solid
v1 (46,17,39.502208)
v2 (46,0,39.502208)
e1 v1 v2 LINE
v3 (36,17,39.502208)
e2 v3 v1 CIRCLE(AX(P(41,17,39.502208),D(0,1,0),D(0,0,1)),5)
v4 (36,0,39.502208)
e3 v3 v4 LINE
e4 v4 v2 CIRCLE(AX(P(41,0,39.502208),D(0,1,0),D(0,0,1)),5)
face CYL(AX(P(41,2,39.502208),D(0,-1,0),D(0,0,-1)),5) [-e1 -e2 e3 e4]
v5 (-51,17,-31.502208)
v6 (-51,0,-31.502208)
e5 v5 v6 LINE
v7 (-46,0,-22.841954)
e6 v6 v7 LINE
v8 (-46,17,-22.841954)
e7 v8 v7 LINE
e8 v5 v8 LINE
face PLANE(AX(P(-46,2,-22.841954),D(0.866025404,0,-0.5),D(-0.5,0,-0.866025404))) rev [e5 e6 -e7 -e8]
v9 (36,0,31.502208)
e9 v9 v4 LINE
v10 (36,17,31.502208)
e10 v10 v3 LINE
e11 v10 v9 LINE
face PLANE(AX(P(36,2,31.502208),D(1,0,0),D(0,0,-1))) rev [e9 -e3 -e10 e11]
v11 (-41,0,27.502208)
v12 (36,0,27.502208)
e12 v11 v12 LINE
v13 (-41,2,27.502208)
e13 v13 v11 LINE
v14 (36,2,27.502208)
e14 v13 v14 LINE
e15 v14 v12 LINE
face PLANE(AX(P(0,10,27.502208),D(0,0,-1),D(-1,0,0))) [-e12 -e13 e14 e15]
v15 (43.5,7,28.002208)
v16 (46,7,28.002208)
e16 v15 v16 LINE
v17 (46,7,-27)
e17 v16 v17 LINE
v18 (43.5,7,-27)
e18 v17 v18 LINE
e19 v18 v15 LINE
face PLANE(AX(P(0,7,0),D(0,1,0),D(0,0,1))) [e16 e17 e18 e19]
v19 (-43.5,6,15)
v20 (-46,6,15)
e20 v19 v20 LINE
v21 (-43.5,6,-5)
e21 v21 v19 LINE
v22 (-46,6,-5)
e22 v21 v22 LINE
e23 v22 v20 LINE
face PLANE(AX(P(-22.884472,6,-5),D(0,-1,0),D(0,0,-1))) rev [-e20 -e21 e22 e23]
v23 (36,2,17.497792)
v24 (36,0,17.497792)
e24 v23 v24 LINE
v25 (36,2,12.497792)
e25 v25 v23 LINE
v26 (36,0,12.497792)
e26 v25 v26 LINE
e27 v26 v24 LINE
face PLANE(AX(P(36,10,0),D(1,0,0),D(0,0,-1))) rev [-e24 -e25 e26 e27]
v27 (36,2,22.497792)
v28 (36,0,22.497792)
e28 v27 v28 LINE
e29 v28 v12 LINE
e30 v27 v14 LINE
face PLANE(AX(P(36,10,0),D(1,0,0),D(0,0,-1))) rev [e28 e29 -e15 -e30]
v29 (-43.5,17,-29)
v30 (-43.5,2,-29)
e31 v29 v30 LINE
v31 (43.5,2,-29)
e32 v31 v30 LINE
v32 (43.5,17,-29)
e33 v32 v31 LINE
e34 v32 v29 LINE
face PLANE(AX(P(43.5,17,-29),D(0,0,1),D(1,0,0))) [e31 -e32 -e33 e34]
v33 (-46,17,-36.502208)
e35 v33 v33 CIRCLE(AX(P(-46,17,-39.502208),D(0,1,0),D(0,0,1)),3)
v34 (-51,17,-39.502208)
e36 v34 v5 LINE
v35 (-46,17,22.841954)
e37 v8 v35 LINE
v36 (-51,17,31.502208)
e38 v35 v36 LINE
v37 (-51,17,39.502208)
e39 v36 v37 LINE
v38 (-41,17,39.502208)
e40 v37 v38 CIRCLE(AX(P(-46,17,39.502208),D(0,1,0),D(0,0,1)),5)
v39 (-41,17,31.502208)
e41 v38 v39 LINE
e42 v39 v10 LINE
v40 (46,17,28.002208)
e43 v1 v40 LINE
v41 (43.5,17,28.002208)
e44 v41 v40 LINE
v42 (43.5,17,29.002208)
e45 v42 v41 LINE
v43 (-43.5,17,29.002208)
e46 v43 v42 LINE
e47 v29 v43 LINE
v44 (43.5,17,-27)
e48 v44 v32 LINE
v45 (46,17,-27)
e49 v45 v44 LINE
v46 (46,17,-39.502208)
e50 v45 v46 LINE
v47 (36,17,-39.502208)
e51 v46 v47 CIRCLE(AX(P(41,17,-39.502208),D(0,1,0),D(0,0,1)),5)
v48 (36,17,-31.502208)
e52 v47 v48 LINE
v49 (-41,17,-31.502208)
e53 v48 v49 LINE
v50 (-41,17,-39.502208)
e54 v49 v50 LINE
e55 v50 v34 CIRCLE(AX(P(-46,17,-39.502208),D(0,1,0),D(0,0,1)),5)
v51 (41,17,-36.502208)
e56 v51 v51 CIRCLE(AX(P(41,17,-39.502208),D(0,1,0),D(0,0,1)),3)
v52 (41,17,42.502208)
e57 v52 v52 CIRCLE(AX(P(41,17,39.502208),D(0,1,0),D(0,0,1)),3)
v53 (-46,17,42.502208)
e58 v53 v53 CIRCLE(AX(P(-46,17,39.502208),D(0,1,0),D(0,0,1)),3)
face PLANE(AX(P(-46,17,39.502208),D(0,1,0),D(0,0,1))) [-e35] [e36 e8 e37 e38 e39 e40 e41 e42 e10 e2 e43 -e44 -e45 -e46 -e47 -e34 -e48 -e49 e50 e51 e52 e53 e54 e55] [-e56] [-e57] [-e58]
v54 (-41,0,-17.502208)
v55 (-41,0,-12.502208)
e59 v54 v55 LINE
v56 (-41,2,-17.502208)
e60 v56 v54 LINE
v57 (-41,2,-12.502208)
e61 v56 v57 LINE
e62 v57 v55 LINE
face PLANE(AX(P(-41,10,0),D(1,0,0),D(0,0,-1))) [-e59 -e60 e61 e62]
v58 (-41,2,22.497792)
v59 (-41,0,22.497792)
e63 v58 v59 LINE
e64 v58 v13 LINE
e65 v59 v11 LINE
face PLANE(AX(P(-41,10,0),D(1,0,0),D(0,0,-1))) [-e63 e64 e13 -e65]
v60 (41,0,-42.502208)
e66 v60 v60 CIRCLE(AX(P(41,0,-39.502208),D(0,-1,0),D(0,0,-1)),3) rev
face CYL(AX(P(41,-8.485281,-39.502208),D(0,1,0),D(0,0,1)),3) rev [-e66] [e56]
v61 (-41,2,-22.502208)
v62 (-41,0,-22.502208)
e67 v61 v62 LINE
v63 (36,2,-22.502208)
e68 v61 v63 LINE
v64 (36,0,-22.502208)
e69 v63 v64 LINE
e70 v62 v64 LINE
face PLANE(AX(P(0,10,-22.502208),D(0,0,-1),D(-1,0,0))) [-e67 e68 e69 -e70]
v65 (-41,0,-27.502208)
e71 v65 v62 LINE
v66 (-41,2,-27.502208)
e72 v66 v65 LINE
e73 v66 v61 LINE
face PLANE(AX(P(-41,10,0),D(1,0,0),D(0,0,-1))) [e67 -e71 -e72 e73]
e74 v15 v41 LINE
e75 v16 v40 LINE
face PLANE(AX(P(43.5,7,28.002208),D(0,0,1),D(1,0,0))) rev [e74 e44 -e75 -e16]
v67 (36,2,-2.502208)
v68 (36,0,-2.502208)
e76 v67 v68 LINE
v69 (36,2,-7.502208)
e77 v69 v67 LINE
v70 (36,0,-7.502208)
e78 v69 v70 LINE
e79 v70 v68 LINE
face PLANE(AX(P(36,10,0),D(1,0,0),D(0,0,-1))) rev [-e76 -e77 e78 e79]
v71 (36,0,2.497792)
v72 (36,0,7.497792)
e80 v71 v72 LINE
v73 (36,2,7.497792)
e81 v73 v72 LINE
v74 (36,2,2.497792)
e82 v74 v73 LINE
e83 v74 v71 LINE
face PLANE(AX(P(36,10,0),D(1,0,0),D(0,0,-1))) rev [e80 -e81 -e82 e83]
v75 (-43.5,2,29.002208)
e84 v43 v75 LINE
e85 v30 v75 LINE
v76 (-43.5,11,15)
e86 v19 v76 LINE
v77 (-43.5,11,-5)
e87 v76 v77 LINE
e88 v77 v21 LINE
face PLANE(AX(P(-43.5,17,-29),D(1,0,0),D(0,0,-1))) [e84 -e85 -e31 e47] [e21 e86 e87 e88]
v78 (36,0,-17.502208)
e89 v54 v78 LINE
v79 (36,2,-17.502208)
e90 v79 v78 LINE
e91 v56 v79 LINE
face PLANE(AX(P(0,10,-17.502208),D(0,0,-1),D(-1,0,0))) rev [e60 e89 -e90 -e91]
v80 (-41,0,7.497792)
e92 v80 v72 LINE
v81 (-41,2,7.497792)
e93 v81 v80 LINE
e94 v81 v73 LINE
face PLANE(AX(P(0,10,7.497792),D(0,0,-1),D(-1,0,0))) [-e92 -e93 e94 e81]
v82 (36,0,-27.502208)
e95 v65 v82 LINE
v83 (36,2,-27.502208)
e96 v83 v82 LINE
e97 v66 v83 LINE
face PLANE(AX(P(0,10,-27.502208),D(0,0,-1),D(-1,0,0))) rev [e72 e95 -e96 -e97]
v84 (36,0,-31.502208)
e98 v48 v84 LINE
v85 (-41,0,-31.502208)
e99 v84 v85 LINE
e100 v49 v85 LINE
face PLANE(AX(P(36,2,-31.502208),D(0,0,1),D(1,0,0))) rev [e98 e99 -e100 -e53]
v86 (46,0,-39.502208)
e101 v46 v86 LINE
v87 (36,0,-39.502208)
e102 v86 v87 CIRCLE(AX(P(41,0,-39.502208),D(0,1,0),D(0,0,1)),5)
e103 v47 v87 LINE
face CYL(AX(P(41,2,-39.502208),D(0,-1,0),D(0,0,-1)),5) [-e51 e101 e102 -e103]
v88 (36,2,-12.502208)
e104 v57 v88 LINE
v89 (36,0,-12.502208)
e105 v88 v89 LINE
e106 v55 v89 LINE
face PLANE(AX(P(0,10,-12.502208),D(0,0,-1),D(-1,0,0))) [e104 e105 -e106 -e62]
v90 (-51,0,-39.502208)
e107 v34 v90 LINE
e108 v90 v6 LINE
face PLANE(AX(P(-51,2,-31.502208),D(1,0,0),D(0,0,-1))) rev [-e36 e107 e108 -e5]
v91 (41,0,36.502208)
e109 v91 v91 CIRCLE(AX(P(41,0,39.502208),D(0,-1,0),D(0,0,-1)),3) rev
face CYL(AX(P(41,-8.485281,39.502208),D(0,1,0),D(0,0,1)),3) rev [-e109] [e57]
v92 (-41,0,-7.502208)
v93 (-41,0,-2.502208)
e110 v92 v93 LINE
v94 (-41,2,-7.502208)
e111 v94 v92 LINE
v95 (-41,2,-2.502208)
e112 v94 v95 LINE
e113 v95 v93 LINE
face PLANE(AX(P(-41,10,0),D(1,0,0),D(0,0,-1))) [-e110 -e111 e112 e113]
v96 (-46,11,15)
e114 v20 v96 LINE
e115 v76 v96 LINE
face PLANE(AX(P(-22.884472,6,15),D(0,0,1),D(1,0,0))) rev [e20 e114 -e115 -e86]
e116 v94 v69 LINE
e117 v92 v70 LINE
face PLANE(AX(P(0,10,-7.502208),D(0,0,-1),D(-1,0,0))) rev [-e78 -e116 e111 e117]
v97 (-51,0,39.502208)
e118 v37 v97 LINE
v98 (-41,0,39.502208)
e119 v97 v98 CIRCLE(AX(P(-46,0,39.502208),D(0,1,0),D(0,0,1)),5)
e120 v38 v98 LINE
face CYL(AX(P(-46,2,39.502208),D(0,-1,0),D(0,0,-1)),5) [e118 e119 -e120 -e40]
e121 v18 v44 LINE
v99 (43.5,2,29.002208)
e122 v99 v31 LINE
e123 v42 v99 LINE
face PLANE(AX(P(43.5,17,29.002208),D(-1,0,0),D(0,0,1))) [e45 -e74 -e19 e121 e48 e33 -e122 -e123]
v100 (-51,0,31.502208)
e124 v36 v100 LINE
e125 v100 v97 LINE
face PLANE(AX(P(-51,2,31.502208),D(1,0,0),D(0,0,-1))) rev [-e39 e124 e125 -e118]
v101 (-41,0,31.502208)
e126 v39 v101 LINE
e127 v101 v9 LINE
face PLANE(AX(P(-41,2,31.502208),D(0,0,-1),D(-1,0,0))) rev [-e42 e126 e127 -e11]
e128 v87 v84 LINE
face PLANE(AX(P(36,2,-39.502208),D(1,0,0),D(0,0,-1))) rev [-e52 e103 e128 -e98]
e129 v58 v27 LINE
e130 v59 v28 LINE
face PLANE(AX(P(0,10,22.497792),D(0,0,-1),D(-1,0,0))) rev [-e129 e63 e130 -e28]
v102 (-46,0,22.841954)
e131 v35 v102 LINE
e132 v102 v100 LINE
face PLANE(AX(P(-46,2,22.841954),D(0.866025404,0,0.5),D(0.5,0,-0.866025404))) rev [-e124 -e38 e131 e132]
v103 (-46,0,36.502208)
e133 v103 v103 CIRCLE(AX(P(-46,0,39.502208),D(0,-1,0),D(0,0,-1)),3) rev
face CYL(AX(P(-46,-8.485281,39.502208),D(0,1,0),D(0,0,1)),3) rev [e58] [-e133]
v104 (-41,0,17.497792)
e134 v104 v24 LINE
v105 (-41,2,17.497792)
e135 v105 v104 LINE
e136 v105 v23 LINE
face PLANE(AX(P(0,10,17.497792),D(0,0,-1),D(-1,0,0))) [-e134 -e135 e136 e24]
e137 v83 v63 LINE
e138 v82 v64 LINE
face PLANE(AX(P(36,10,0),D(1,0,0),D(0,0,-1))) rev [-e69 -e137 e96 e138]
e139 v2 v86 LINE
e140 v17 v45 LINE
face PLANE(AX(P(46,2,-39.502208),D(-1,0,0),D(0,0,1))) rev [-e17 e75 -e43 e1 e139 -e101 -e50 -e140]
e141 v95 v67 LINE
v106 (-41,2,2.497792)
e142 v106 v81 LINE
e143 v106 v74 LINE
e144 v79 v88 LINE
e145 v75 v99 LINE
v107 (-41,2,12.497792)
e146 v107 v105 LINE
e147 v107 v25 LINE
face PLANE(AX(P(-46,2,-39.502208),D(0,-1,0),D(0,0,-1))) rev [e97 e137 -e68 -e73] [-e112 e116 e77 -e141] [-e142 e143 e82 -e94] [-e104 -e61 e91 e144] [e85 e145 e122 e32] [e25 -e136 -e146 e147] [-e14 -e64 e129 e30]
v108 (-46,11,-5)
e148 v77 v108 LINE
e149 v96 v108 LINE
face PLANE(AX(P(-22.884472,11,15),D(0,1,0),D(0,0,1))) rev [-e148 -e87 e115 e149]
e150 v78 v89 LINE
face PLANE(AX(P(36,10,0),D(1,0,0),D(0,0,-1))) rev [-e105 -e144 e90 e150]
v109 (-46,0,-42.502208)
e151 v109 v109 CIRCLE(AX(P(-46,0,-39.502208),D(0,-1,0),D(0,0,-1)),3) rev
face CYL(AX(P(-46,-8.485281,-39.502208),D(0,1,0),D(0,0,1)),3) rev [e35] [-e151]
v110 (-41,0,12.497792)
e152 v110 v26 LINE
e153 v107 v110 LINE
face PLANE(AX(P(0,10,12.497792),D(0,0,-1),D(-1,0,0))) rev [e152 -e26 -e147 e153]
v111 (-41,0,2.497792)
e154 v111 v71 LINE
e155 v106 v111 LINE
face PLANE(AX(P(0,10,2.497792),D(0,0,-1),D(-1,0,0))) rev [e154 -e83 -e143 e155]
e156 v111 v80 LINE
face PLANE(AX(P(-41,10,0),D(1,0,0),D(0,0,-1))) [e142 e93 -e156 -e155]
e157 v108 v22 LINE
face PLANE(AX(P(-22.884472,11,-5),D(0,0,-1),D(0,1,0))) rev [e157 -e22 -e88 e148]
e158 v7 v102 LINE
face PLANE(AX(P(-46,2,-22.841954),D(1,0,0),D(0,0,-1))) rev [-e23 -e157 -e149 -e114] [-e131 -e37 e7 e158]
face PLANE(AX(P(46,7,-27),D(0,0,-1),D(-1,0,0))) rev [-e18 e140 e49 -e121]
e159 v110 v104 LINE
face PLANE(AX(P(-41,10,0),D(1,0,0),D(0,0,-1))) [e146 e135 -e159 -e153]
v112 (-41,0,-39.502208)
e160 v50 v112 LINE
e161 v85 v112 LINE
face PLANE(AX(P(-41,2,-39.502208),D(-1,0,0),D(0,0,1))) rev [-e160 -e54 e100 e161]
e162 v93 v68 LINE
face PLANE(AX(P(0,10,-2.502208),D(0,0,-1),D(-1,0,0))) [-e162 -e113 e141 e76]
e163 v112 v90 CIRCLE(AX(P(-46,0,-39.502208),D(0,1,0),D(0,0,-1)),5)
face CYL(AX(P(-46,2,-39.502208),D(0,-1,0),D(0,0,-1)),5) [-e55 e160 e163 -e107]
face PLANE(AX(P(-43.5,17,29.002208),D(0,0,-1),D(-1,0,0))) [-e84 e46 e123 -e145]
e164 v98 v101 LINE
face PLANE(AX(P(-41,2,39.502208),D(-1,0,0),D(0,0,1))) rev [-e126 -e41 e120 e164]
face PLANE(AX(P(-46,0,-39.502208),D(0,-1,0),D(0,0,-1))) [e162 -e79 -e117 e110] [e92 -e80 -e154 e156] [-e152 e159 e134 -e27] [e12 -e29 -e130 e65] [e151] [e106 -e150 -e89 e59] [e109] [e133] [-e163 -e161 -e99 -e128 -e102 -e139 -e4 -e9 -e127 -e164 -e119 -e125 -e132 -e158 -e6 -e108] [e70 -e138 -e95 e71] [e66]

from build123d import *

# Parameters (mm, degrees)
BOSS_EXTRUDE1_DEPTH = 2
SKETCH6_W           = 87
SKETCH6_H           = 58.002207555
BOSS_EXTRUDE3_DEPTH = 15
SKETCH10_W          = 2.5
SKETCH10_H          = 55.002207555
CUT_EXTRUDE2_DEPTH  = 10
HOLE5_START         = -1
HOLE5_OUTLINE_R     = 3
HOLE5_DEPTH         = 18
SKETCH15_W          = 20
SKETCH15_H          = 5
CUT_EXTRUDE4_DEPTH  = 2.5
SKETCH_2_W          = 77
SKETCH_2_H          = 5
SKETCH_2_H_2        = 5.00441511
CUT_EXTRUDE_4_DEPTH = 10


with BuildPart() as part:
    # Sketch1 → Boss-Extrude1 (new body)
    with BuildSketch(Plane(origin=(0, 0, 0), x_dir=(1, 0, 0), z_dir=(0, 1, 0))):
        with BuildLine():
            Line((-46, 22.841953517), (-46, -22.841953517))
            Line((-46, -22.841953517), (-51, -31.502207555))
            Line((-51, -31.502207555), (-51, -39.502207555))
            ThreePointArc((-51, -39.502207555), (-46, -44.502207555), (-41, -39.502207555))
            Line((-41, -39.502207555), (-41, -31.502207555))
            Line((-41, -31.502207555), (36, -31.502207555))
            Line((36, -31.502207555), (36, -39.502207555))
            ThreePointArc((36, -39.502207555), (41, -44.502207555), (46, -39.502207555))
            Line((46, -39.502207555), (46, 39.502207555))
            ThreePointArc((46, 39.502207555), (41, 44.502207555), (36, 39.502207555))
            Line((36, 39.502207555), (36, 31.502207555))
            Line((36, 31.502207555), (-41, 31.502207555))
            Line((-41, 31.502207555), (-41, 39.502207555))
            ThreePointArc((-41, 39.502207555), (-46, 44.502207555), (-51, 39.502207555))
            Line((-51, 39.502207555), (-51, 31.502207555))
            Line((-51, 31.502207555), (-46, 22.841953517))
        make_face()
    extrude(amount=BOSS_EXTRUDE1_DEPTH)

    # Sketch6 → Boss-Extrude3 (add)
    with BuildSketch(Plane(origin=(0, 2, 0), x_dir=(1, 0, 0), z_dir=(0, 1, 0))):
        with BuildLine():
            Line((-46, -22.841953517), (-51, -31.502207555))
            Line((-51, -31.502207555), (-51, -39.502207555))
            ThreePointArc((-51, -39.502207555), (-46, -44.502207555), (-41, -39.502207555))
            Line((-41, -39.502207555), (-41, -31.502207555))
            Line((-41, -31.502207555), (36, -31.502207555))
            Line((36, -31.502207555), (36, -39.502207555))
            ThreePointArc((36, -39.502207555), (41, -44.502207555), (46, -39.502207555))
            Line((46, -39.502207555), (46, 39.502207555))
            ThreePointArc((46, 39.502207555), (41, 44.502207555), (36, 39.502207555))
            Line((36, 39.502207555), (36, 31.502207555))
            Line((36, 31.502207555), (-41, 31.502207555))
            Line((-41, 31.502207555), (-41, 39.502207555))
            ThreePointArc((-41, 39.502207555), (-46, 44.502207555), (-51, 39.502207555))
            Line((-51, 39.502207555), (-51, 31.502207555))
            Line((-51, 31.502207555), (-46, 22.841953517))
            Line((-46, 22.841953517), (-46, -22.841953517))
        make_face()
        with Locations((0, -0.001103777)):
            Rectangle(SKETCH6_W, SKETCH6_H, mode=Mode.SUBTRACT)
    extrude(amount=BOSS_EXTRUDE3_DEPTH)

    # Sketch10 → Cut-Extrude2 (cut)
    with BuildSketch(Plane(origin=(0, 17, 0), x_dir=(1, 0, 0), z_dir=(0, 1, 0))):
        with Locations((44.75, -0.501103778)):
            Rectangle(SKETCH10_W, SKETCH10_H)
    extrude(amount=-CUT_EXTRUDE2_DEPTH, mode=Mode.SUBTRACT)

    # Hole5: read off the stored shape, not the designer's step
    # Hole5 outline → Hole5 (cut)
    with BuildSketch(Plane(origin=(0, 0, 0), x_dir=(1, 0, 0), z_dir=(0, 1, 0)).offset(HOLE5_START)):
        with Locations((-46, -39.502207555)):
            Circle(HOLE5_OUTLINE_R)
        with Locations((41, -39.502207555)):
            Circle(HOLE5_OUTLINE_R)
        with Locations((41, 39.502207555)):
            Circle(HOLE5_OUTLINE_R)
        with Locations((-46, 39.502207555)):
            Circle(HOLE5_OUTLINE_R)
    extrude(amount=HOLE5_DEPTH, mode=Mode.SUBTRACT)

    # Sketch15 → Cut-Extrude4 (cut)
    with BuildSketch(Plane.ZY.offset(46)):
        with Locations((5, 8.5)):
            Rectangle(SKETCH15_W, SKETCH15_H)
    extrude(amount=-CUT_EXTRUDE4_DEPTH, mode=Mode.SUBTRACT)

    # 草图2 → 切除-拉伸4 (cut)
    with BuildSketch(Plane.XZ):
        with Locations((-2.5, -25.002207555)):
            Rectangle(SKETCH_2_W, SKETCH_2_H)
        with Locations((-2.5, -15.002207555)):
            Rectangle(SKETCH_2_W, SKETCH_2_H)
        with Locations((-2.5, -5.002207555)):
            Rectangle(SKETCH_2_W, SKETCH_2_H)
        with Locations((-2.5, 4.997792445)):
            Rectangle(SKETCH_2_W, SKETCH_2_H)
        with Locations((-2.5, 14.997792445)):
            Rectangle(SKETCH_2_W, SKETCH_2_H)
        with Locations((-2.5, 25)):
            Rectangle(SKETCH_2_W, SKETCH_2_H_2)
    extrude(amount=-CUT_EXTRUDE_4_DEPTH, mode=Mode.SUBTRACT)


solid = part.part
